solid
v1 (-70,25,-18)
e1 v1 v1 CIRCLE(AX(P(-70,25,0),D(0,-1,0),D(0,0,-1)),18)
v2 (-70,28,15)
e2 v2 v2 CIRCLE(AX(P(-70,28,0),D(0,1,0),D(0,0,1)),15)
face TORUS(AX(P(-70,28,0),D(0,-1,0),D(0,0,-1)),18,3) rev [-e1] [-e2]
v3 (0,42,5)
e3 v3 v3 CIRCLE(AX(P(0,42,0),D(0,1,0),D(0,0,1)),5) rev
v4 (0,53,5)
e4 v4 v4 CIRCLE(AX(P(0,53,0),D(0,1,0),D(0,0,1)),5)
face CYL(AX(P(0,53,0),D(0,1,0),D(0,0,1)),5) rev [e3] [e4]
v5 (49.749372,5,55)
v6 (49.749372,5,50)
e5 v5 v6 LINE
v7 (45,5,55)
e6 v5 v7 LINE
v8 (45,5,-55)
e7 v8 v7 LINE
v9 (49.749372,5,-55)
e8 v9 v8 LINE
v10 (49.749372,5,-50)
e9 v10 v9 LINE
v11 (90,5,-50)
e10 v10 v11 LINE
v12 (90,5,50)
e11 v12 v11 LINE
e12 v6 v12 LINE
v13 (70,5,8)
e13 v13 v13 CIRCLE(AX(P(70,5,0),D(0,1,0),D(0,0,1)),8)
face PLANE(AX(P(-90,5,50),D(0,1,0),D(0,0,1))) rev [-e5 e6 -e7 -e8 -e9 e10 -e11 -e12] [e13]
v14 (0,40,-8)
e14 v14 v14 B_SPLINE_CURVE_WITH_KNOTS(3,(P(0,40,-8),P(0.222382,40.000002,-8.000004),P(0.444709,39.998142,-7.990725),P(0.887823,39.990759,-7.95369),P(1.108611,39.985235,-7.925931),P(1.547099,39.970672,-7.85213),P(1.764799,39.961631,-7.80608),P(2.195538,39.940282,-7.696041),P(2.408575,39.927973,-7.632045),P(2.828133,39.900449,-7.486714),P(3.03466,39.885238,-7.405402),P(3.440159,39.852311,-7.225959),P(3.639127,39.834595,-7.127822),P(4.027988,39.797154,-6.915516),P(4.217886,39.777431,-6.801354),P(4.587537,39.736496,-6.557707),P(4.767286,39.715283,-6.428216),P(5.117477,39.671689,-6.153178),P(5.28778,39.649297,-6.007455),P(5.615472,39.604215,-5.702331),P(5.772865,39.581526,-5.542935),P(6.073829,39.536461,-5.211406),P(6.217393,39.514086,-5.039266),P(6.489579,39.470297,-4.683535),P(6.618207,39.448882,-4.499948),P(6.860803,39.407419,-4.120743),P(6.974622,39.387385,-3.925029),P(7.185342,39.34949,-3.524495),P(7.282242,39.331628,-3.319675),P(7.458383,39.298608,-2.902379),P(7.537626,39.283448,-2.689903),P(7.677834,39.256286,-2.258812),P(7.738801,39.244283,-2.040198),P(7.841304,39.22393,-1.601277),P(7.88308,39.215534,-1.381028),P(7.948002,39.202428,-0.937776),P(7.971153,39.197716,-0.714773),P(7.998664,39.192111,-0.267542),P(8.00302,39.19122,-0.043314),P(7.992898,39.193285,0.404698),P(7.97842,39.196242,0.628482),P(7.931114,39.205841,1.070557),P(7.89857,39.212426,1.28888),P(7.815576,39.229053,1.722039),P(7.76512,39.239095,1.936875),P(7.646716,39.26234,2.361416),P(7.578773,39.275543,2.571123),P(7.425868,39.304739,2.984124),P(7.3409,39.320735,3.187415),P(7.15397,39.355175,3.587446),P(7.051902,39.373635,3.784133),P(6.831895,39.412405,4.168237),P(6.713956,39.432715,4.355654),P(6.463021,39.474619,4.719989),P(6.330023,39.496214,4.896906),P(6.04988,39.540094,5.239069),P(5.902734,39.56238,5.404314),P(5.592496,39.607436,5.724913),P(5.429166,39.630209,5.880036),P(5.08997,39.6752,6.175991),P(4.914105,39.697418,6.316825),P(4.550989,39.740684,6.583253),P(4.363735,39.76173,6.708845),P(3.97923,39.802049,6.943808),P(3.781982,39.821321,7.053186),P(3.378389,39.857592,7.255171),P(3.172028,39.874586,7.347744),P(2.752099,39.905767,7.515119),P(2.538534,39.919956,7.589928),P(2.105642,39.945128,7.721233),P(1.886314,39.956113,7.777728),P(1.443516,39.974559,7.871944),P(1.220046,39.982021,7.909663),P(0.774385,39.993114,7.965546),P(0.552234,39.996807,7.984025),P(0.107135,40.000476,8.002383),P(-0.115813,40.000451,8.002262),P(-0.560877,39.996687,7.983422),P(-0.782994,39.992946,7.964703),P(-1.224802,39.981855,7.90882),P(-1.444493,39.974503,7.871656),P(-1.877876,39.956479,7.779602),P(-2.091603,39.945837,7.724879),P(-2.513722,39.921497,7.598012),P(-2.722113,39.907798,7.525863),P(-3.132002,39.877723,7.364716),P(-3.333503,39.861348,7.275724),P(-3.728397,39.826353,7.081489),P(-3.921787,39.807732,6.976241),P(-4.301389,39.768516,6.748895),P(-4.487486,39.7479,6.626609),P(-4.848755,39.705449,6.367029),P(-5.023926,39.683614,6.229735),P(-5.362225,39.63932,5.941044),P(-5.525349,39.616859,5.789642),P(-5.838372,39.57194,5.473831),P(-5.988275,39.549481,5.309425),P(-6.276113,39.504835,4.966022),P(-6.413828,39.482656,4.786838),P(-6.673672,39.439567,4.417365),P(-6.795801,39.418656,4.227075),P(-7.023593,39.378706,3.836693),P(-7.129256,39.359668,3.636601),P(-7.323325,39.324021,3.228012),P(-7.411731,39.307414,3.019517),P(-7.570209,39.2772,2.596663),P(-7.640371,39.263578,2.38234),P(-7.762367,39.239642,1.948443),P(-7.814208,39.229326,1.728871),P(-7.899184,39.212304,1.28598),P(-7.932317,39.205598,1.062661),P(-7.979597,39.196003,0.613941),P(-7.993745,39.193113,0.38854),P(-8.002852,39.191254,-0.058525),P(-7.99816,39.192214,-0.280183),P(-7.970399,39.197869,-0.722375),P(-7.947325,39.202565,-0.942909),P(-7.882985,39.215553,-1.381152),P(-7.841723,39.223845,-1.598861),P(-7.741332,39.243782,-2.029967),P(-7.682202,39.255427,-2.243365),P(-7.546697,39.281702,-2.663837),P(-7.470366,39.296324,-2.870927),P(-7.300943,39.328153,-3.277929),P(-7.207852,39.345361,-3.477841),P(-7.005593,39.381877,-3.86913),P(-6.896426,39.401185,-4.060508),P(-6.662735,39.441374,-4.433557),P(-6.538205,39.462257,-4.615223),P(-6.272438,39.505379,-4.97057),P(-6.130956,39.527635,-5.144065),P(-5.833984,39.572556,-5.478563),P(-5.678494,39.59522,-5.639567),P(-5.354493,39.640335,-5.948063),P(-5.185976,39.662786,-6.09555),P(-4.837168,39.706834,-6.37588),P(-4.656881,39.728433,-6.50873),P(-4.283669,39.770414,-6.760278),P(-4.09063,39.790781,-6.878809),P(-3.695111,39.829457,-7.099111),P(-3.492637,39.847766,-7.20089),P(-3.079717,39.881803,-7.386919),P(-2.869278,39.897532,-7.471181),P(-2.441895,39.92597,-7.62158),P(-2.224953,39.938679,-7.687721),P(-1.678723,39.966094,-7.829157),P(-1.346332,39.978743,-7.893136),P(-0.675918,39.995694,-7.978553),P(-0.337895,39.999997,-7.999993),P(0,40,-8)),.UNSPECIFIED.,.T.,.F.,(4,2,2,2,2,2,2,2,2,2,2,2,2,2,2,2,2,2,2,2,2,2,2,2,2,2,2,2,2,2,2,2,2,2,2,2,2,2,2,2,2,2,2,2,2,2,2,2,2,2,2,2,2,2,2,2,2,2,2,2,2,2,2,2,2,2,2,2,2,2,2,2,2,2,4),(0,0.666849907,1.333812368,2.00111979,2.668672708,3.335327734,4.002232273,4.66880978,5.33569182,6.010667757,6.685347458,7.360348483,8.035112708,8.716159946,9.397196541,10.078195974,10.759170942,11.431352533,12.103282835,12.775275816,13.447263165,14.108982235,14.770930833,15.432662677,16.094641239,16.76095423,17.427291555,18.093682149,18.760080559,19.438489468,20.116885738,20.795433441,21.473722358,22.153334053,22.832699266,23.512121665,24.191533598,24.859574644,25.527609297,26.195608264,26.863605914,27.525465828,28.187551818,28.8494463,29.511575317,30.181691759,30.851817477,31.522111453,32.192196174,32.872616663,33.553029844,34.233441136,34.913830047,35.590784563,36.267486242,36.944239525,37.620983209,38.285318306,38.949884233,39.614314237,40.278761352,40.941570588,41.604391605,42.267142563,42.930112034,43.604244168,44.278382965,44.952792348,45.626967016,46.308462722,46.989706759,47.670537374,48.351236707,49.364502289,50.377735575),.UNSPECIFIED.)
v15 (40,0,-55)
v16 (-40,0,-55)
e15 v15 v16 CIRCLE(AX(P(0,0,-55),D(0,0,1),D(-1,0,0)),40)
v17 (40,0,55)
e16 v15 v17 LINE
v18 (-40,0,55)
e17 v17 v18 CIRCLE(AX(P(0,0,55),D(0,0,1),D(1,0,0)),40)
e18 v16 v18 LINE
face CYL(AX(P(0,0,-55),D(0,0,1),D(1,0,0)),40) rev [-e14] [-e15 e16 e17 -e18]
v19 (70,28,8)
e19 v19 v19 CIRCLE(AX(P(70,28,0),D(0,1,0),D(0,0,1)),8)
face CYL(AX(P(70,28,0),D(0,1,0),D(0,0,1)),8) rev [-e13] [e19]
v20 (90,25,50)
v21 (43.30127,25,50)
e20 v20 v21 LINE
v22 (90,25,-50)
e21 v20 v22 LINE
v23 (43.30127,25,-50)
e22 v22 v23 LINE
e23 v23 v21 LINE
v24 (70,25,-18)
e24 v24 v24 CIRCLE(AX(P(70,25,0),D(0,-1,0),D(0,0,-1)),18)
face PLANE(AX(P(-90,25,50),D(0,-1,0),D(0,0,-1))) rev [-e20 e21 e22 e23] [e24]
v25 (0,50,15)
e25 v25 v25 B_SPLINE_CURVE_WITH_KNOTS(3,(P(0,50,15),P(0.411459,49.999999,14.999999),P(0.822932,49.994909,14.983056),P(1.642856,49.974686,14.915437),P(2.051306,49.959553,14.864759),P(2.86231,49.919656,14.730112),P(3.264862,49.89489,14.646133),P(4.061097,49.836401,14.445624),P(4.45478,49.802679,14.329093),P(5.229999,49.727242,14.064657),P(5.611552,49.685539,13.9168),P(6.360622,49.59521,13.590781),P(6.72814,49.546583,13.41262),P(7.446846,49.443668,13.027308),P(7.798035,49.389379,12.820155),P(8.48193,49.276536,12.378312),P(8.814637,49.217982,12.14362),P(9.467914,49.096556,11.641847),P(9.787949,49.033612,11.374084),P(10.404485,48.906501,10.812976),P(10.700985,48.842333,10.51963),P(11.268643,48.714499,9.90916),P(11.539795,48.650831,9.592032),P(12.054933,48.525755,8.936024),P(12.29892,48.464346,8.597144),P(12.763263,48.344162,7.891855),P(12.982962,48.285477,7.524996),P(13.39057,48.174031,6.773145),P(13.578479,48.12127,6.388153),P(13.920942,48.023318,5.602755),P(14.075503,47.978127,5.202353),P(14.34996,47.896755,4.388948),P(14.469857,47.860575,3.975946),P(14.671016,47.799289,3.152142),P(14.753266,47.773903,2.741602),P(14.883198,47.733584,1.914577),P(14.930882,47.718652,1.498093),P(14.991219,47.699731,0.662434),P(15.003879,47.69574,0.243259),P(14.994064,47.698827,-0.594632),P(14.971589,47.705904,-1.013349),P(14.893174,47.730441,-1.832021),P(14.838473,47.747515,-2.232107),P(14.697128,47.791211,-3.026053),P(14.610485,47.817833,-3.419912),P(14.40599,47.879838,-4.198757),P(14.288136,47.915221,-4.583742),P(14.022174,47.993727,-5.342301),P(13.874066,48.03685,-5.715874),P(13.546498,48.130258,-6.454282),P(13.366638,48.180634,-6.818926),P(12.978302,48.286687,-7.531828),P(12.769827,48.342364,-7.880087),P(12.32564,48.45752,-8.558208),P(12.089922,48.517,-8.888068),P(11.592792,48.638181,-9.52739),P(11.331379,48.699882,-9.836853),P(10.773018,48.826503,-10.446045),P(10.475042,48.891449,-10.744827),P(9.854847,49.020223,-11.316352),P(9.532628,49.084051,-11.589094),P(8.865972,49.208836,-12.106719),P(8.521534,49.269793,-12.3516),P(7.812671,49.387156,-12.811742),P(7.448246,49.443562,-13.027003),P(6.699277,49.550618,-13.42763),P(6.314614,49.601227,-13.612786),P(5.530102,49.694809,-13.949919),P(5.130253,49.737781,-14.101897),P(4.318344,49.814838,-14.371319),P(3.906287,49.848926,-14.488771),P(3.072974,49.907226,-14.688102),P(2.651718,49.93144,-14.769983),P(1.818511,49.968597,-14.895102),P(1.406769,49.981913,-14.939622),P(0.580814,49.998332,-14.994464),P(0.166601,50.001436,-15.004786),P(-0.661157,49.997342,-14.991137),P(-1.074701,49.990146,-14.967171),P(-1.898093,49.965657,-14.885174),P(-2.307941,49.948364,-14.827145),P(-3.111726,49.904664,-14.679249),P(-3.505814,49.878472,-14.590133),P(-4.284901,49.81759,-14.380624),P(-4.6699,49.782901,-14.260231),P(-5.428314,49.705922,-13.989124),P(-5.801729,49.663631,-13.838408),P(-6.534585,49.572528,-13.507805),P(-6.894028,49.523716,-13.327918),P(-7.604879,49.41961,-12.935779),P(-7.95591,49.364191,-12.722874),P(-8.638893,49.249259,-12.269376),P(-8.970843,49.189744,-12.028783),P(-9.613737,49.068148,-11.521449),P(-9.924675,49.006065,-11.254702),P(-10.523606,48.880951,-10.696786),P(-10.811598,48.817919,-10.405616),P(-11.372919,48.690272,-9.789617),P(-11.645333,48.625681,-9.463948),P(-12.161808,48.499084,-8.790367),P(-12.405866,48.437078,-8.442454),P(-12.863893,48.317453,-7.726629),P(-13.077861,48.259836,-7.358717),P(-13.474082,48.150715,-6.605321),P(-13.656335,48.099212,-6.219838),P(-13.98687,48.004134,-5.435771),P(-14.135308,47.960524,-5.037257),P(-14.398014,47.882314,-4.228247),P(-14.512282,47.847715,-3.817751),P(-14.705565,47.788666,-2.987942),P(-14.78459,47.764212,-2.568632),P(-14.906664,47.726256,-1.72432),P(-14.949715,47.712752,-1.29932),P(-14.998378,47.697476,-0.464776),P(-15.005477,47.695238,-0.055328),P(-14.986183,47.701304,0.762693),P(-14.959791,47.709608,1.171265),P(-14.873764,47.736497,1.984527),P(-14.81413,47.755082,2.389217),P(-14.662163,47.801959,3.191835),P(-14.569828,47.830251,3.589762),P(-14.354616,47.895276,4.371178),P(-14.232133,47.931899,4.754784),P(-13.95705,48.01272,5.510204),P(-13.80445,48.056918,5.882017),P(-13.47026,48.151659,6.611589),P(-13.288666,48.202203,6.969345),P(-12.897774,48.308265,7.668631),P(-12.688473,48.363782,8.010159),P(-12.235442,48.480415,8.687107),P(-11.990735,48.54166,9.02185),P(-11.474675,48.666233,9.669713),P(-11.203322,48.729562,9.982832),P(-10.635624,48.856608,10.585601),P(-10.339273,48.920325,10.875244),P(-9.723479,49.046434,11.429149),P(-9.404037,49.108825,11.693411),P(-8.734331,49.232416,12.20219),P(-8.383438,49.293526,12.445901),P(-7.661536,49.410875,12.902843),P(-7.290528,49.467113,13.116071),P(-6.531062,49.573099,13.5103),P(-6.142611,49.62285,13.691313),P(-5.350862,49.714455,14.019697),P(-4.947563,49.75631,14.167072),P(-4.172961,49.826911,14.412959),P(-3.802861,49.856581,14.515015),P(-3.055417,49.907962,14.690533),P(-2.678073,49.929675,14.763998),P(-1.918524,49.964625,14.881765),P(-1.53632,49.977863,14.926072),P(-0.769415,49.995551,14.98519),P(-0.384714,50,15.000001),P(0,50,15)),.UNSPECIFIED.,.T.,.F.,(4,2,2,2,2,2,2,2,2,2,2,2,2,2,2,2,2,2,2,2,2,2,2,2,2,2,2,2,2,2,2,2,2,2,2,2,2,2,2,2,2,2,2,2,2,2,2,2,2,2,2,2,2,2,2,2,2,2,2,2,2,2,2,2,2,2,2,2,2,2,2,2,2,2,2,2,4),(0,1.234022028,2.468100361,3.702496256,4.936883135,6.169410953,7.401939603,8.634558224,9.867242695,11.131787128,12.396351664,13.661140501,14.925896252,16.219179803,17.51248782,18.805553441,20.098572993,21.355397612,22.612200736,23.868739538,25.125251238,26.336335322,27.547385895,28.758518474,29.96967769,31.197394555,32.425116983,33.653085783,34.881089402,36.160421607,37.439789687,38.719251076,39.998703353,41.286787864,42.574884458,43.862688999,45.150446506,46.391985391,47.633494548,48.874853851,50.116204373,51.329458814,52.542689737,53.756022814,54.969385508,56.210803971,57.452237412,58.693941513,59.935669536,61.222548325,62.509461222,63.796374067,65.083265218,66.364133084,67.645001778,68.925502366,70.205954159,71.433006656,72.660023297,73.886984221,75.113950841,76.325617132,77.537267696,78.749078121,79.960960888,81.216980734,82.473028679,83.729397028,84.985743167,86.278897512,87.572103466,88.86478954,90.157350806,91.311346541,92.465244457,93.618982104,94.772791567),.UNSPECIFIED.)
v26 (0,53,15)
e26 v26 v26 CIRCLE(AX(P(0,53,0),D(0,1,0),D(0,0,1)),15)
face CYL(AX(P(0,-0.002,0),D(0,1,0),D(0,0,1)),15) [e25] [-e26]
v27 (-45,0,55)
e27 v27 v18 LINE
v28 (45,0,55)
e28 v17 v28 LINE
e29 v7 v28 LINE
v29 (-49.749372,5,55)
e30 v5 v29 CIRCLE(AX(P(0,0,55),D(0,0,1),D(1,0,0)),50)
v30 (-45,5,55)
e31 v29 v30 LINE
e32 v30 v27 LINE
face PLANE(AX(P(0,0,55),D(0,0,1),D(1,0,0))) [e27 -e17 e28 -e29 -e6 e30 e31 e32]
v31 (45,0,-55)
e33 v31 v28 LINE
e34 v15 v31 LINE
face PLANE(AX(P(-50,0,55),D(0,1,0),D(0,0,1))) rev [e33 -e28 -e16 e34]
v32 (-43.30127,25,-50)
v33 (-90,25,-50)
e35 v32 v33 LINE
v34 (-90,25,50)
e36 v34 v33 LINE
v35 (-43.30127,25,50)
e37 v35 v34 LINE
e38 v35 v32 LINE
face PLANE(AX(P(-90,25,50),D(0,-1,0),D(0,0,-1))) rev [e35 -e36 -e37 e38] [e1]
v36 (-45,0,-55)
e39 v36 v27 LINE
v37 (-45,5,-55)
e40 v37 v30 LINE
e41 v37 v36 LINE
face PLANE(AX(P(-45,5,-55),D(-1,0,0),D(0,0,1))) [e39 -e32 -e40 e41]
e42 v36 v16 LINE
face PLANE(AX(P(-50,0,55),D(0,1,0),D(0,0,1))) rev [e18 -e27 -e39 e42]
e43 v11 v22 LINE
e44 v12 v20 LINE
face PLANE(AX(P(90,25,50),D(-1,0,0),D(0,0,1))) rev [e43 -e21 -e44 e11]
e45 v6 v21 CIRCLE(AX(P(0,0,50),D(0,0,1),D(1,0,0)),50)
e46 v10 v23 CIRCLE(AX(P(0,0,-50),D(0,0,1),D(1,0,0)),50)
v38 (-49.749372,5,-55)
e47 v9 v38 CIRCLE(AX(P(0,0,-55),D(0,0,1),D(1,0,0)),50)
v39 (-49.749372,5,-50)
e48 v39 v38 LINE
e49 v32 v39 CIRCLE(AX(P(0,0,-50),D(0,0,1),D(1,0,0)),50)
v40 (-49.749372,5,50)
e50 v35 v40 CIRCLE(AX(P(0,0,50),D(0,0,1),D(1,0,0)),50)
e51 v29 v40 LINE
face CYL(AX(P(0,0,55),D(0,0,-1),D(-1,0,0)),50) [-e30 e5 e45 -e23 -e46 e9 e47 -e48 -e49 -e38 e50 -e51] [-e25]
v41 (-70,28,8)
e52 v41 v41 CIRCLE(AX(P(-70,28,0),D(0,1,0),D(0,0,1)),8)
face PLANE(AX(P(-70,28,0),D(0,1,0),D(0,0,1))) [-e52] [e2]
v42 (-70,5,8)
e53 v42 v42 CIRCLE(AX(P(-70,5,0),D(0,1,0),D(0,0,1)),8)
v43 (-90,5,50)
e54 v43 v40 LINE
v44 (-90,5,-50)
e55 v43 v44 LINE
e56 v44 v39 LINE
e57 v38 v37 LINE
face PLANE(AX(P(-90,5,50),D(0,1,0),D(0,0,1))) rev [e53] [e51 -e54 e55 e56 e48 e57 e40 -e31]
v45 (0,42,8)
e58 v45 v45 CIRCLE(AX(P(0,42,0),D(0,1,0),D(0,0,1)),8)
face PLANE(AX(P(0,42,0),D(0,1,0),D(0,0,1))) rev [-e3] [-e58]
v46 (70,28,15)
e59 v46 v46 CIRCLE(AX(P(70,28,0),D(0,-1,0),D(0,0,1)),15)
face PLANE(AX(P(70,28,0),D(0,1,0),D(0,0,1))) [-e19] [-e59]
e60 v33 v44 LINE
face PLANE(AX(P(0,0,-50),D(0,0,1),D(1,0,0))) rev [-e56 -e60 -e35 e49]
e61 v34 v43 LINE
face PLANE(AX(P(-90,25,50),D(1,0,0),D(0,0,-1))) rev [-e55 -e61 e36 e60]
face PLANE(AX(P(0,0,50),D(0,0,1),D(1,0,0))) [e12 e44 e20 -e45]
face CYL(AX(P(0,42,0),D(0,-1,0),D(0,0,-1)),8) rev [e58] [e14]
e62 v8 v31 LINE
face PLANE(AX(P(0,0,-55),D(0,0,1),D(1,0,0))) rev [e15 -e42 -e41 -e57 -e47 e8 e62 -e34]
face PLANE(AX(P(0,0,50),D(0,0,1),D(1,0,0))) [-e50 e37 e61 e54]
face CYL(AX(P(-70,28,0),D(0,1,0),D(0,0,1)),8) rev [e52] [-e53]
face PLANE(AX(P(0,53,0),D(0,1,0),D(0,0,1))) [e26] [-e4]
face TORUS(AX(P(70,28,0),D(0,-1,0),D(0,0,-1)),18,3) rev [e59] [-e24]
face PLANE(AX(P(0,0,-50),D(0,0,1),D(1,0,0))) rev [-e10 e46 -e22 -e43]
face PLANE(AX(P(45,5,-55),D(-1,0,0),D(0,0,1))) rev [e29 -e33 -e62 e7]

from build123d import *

# Parameters (mm, degrees)
BOSS_EXTRUDE1_DEPTH      = 55
SKETCH2_W                = 180
SKETCH2_H                = 20
BOSS_EXTRUDE2_DEPTH      = 50
SKETCH3_W                = 5
SKETCH3_H                = 5
CUT_EXTRUDE1_DEPTH       = 151.665191733
CUT_EXTRUDE2_DEPTH       = 151.665191733
CUT_EXTRUDE2_DEPTH_BACK  = 151.665191733
SKETCH5_R                = 15
BOSS_EXTRUDE3_DEPTH      = 3
BOSS_EXTRUDE4_REACH      = 120.042
BOSS_EXTRUDE4_END_RADIUS = 50
SKETCH6_R                = 15
HOLE1_D                  = 10
HOLE2_D                  = 16
FILLET1_R                = 3
SKETCH11_R               = 8
CUT_EXTRUDE3_DEPTH       = 42


with BuildPart() as part:
    # Sketch1 → Boss-Extrude1 (new, symmetric)
    with BuildSketch(Plane.XY):
        with BuildLine():
            Line((-50, 0), (50, 0))
            ThreePointArc((50, 0), (0, 50), (-50, 0))
        make_face()
    extrude(amount=BOSS_EXTRUDE1_DEPTH, both=True)

    # Sketch2 → Boss-Extrude2 (add, symmetric)
    with BuildSketch(Plane.XY):
        with Locations((0, 15)):
            Rectangle(SKETCH2_W, SKETCH2_H)
    extrude(amount=BOSS_EXTRUDE2_DEPTH, both=True)

    # Sketch3 → Cut-Extrude1 (cut, symmetric)
    with BuildSketch(Plane.XY.offset(55)):
        with Locations((47.5, 2.5)):
            Rectangle(SKETCH3_W, SKETCH3_H)
    cut_extrude1 = extrude(amount=CUT_EXTRUDE1_DEPTH, both=True, mode=Mode.SUBTRACT)

    # Mirror1: Cut-Extrude1 across plane
    add(cut_extrude1.mirror(Plane(origin=(0, 0, 0), x_dir=(0, 0, 1), z_dir=(1, 0, 0))), mode=Mode.SUBTRACT)

    # Sketch4 → Cut-Extrude2 (cut, two sides: drawn at the far end of the back side and taken through both)
    with BuildSketch(Plane.XY.offset(55).offset(-CUT_EXTRUDE2_DEPTH_BACK)):
        with BuildLine():
            Line((40, 0), (-40, 0))
            ThreePointArc((-40, 0), (0, 40), (40, 0))
        make_face()
    extrude(amount=CUT_EXTRUDE2_DEPTH + CUT_EXTRUDE2_DEPTH_BACK, mode=Mode.SUBTRACT)

    # Sketch5 → Boss-Extrude3 (add)
    with BuildSketch(Plane(origin=(0, 25, 0), x_dir=(1, 0, 0), z_dir=(0, 1, 0))):
        with Locations(Location((-70, 0, 0), (0, 0, 90))):
            Circle(SKETCH5_R)
    boss_extrude3 = extrude(amount=BOSS_EXTRUDE3_DEPTH)

    # Mirror2: Boss-Extrude3 across plane
    add(boss_extrude3.mirror(Plane(origin=(0, 0, 0), x_dir=(0, 0, 1), z_dir=(1, 0, 0))))

    # Boss-Extrude4: up to this cylinder (the profile starts outside it)
    boss_extrude4_end = Plane(origin=(0, 0, 0), z_dir=(0, 0, -1)) * Cylinder(BOSS_EXTRUDE4_END_RADIUS, 341.084, mode=Mode.PRIVATE)
    # Sketch6 → Boss-Extrude4 (add, up to the surface)
    with BuildSketch(Plane(origin=(0, 53, 0), x_dir=(1, 0, 0), z_dir=(0, 1, 0)), mode=Mode.PRIVATE) as boss_extrude4_sk1:
        with Locations(Location((0, 0, 0), (0, 0, 270))):
            Circle(SKETCH6_R)
    boss_extrude4_tool1 = extrude(boss_extrude4_sk1.sketch, amount=-BOSS_EXTRUDE4_REACH, mode=Mode.PRIVATE) - boss_extrude4_end
    add(boss_extrude4_tool1.solids().sort_by_distance((0, 53, 0))[0])

    # Hole1 (through all)
    with Locations(Plane(origin=(0, 53, 0), x_dir=(1, 0, 0), z_dir=(0, 1, 0))):
        with Locations((0, 0)):
            Hole(HOLE1_D / 2)

    # Hole2 (through all)
    with Locations(Plane(origin=(0, 28, 0), x_dir=(1, 0, 0), z_dir=(0, 1, 0))):
        with Locations((-70, 0), (70, 0)):
            Hole(HOLE2_D / 2)

    # Fillet1
    fillet1_edges = [part.edges().sort_by_distance(p)[0] for p in [
        (-70, 25, 15),
        (70, 25, 15),
    ]]
    fillet(fillet1_edges, radius=FILLET1_R - 0.0001)  # a hair under: the kernel refuses the full size

    # Sketch11 → Cut-Extrude3 (cut)
    with BuildSketch(Plane(origin=(0, 0, 0), x_dir=(1, 0, 0), z_dir=(0, 1, 0))):
        with Locations(Location((0, 0, 0), (0, 0, 90))):
            Circle(SKETCH11_R)
    extrude(amount=CUT_EXTRUDE3_DEPTH, mode=Mode.SUBTRACT)


solid = part.part
